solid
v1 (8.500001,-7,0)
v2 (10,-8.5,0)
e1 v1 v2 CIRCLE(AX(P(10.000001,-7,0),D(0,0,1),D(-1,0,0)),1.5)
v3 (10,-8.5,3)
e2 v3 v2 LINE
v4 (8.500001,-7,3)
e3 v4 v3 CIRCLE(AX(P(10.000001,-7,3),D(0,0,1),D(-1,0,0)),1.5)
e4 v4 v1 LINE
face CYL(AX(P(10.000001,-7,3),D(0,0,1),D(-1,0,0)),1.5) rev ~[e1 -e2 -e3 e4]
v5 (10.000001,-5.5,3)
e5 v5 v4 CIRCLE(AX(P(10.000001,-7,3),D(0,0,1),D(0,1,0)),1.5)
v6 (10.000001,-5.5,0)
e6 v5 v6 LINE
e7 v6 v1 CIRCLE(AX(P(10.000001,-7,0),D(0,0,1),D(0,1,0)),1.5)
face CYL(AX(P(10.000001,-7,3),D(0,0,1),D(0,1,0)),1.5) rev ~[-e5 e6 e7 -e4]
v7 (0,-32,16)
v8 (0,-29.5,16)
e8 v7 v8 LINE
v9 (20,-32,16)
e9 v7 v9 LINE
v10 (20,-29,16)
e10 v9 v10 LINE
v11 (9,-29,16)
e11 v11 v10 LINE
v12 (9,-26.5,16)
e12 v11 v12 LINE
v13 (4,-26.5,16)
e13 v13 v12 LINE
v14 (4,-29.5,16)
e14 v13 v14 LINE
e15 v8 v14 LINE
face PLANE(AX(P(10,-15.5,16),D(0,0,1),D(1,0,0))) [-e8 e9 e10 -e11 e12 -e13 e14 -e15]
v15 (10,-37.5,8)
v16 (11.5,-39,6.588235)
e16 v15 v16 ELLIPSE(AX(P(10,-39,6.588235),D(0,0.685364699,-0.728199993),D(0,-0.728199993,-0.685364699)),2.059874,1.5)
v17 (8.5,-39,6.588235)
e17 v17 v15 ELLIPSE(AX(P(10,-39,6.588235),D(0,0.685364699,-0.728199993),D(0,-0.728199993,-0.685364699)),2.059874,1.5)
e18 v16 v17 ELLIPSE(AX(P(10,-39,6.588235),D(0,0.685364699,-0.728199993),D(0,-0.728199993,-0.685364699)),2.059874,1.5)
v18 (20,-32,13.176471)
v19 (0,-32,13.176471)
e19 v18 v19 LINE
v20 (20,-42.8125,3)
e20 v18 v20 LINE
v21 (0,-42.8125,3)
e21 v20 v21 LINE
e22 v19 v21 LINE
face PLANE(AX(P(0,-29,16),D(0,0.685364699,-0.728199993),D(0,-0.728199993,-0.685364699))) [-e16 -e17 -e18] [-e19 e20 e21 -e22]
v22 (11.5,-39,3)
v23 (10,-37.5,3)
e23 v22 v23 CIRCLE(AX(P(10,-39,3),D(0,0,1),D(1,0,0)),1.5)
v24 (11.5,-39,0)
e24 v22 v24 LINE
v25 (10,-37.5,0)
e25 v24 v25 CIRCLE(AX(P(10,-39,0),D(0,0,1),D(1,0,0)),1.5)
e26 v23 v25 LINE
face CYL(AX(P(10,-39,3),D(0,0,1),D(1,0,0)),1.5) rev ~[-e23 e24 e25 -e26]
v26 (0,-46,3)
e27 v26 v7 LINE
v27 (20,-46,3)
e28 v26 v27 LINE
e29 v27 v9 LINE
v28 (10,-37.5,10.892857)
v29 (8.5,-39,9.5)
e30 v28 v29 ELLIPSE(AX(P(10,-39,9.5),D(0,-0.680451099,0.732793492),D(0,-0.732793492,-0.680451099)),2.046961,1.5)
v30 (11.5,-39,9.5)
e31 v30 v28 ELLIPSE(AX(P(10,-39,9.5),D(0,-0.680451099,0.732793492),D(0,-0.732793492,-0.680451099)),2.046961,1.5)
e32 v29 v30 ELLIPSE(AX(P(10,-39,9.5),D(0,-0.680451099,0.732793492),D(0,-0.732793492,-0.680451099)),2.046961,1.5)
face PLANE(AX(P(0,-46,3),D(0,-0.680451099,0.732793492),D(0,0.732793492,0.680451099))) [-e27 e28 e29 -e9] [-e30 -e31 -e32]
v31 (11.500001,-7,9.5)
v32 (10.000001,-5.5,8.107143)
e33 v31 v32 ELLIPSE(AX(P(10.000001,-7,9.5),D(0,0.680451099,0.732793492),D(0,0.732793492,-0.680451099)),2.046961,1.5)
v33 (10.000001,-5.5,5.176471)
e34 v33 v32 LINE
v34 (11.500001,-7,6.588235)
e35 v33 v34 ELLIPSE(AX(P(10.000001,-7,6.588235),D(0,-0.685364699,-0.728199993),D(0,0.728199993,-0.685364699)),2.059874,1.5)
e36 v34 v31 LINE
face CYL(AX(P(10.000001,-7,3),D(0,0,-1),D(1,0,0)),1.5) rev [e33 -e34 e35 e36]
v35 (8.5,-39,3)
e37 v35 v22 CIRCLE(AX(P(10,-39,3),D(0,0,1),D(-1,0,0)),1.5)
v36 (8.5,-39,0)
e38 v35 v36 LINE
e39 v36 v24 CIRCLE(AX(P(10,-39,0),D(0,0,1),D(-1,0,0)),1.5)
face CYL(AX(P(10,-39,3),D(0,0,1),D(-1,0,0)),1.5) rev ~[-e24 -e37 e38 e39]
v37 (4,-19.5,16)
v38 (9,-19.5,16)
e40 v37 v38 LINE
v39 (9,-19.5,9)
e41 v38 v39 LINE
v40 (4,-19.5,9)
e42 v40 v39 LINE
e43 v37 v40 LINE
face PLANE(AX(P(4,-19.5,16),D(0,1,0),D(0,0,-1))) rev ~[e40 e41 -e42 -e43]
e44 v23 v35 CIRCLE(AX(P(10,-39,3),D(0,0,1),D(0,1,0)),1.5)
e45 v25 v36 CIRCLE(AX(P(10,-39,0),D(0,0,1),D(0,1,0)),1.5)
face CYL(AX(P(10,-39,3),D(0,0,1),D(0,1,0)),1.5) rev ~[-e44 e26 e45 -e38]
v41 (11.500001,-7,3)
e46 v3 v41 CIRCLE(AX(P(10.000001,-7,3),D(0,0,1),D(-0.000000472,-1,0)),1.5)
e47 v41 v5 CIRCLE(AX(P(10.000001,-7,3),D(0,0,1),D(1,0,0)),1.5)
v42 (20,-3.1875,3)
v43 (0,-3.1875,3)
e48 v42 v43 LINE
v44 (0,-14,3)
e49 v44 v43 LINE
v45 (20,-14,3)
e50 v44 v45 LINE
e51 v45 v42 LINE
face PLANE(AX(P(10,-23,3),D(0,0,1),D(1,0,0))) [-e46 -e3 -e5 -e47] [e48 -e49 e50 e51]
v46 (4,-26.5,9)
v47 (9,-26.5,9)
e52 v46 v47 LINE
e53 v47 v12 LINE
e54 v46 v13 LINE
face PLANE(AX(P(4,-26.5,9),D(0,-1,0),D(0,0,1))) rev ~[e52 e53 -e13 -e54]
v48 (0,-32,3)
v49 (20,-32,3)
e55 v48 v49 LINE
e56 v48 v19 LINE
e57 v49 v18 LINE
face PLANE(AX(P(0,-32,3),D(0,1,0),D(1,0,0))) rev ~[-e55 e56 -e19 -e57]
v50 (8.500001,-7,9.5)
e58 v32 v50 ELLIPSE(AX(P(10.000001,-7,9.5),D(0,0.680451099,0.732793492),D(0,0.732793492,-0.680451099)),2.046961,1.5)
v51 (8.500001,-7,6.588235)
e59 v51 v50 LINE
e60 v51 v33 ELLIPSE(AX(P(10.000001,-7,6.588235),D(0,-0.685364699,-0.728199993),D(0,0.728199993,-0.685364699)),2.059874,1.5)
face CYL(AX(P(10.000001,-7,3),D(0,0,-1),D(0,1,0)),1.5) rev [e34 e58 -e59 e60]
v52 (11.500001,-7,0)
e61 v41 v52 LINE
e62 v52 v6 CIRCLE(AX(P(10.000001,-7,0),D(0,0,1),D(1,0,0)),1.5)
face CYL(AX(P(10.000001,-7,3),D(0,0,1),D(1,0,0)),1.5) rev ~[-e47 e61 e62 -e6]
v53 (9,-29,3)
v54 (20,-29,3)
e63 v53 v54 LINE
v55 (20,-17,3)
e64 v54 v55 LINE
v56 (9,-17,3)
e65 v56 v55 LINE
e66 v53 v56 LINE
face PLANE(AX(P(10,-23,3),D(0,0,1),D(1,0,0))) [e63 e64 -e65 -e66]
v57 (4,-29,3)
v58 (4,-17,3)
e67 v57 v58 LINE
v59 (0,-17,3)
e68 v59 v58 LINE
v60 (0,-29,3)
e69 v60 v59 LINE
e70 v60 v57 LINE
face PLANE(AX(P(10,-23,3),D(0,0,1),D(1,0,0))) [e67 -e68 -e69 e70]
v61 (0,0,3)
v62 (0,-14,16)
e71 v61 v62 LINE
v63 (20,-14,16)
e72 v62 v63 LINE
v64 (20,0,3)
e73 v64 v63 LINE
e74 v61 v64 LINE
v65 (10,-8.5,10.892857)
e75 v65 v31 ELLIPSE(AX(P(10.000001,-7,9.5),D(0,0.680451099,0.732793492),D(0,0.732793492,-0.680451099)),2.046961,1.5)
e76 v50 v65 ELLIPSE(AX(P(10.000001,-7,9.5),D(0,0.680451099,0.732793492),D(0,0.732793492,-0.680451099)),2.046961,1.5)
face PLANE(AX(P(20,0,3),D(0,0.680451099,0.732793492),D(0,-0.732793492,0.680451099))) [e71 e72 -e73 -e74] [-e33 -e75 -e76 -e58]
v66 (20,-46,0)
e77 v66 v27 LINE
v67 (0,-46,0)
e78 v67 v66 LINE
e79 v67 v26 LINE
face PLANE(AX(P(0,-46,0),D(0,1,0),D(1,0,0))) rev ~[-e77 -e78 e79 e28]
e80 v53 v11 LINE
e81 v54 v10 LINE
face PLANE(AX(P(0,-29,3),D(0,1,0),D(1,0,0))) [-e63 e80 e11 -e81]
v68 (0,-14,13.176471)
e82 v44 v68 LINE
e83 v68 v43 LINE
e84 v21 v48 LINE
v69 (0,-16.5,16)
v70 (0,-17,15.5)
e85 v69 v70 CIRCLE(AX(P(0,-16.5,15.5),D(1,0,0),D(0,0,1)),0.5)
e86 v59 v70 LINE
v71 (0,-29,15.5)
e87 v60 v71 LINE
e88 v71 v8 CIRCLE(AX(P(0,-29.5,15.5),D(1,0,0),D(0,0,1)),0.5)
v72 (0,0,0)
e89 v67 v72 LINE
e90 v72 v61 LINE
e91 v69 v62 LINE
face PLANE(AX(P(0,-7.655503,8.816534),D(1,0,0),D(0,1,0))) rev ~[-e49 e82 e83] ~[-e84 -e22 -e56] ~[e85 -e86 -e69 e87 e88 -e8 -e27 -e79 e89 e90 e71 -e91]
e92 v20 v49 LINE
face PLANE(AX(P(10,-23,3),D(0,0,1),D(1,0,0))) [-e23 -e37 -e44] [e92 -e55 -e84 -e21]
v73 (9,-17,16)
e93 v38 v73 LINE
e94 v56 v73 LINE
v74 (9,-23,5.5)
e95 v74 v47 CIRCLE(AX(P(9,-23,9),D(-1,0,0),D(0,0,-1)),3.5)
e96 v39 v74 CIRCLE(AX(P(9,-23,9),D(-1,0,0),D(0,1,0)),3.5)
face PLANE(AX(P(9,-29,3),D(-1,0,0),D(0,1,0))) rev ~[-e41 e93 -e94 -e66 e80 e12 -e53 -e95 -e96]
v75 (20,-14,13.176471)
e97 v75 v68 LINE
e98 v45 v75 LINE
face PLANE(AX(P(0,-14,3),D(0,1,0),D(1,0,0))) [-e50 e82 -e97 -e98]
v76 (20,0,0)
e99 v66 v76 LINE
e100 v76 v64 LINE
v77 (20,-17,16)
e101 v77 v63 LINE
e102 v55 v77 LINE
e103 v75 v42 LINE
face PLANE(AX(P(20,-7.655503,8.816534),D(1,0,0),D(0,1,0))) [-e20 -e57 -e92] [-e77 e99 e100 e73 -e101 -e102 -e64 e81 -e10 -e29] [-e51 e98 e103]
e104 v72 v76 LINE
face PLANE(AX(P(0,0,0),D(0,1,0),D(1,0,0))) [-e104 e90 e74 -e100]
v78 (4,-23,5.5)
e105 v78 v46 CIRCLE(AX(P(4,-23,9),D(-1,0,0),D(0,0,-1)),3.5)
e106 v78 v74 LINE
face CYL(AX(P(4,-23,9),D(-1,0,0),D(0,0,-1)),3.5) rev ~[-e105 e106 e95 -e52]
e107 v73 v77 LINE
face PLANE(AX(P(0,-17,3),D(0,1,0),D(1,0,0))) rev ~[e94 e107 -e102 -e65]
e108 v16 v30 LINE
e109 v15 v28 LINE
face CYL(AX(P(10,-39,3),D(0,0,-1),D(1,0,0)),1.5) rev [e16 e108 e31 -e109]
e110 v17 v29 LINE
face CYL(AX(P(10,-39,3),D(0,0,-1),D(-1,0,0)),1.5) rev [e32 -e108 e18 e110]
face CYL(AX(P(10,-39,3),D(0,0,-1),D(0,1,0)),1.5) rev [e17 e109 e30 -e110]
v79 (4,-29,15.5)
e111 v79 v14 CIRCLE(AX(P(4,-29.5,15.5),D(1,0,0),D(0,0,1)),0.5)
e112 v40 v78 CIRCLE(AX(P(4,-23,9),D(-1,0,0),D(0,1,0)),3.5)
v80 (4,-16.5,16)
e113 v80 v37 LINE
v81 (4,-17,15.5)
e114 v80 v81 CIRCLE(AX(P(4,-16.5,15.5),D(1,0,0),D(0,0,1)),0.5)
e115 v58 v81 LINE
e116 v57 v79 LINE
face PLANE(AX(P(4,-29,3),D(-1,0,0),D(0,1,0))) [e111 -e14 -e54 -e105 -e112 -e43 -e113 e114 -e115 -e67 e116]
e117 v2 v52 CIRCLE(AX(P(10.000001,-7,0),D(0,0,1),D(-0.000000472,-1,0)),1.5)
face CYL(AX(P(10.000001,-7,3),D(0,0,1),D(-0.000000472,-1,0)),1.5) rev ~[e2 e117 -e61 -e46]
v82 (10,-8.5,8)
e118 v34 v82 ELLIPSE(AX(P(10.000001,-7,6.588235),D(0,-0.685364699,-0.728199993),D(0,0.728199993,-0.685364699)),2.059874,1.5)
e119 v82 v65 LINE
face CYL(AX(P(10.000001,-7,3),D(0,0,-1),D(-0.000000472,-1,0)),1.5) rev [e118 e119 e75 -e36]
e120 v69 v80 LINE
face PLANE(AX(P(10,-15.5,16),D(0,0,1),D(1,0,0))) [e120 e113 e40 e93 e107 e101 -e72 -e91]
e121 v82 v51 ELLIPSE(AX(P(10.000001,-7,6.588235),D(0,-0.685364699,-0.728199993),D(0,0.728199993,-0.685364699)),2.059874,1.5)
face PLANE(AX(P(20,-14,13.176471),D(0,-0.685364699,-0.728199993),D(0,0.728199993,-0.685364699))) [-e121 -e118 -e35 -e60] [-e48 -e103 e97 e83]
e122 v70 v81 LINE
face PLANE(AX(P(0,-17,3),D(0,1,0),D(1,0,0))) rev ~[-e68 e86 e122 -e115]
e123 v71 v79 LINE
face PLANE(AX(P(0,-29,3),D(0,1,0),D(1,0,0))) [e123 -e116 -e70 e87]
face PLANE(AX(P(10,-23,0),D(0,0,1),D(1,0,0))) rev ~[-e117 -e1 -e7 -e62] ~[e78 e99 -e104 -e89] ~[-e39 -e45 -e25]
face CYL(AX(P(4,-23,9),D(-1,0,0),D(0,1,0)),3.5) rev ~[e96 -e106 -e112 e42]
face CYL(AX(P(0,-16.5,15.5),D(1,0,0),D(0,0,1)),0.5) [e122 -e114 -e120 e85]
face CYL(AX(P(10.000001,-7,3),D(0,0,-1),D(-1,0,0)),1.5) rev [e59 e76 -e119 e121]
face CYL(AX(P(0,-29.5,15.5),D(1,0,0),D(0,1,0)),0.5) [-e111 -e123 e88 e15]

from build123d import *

# Parameters (mm, degrees)
F0_W      = 20
F0_H      = 46
F1_DEPTH  = 3
F2_W      = 20
F2_H      = 3
F3_DEPTH  = 13
F6_DEPTH  = 25
F7_DEPTH  = 25
F9_DEPTH  = 20
F11_DEPTH = 20
F12_DEPTH = 25
F13_DEPTH = 25
F14_W     = 5
F14_H     = 12
F15_DEPTH = 13
F17_DEPTH = 25
F18_R     = 0.5


# Not quite as in the source:
# - ends of sketch curves that miss each other by under 0.0002 mm in the source are joined


with BuildPart() as f1:
    # F0 (on Top) → F1 (new body)
    with BuildSketch(Plane.XY):
        with Locations((10, -23)):
            Rectangle(F0_W, F0_H)
    extrude(amount=F1_DEPTH)

    # F2 (on face) → F3 (join)
    with BuildSketch(Plane.XY.offset(3)):
        with Locations((10, -15.5)):
            Rectangle(F2_W, F2_H)
        with Locations((10, -30.5)):
            Rectangle(F2_W, F2_H)
    extrude(amount=F3_DEPTH)

    # F5 (on face) → F6 (cut)
    with BuildSketch(Plane.XY.offset(3)):
        with BuildLine():
            Line((10, -39), (8.5, -39))
            ThreePointArc((8.5, -39), (10, -40.5), (11.5, -39))
            ThreePointArc((11.5, -39), (11.0606601718, -37.9393398282), (10, -37.5))
            Line((10, -37.5), (10, -39))
        make_face()
        with BuildLine():
            ThreePointArc((10, -37.5), (8.9393398282, -37.9393398282), (8.5, -39))
            Line((8.5, -39), (10, -39))
            Line((10, -39), (10, -37.5))
        make_face()
    extrude(amount=-F6_DEPTH, mode=Mode.SUBTRACT)

    # F5 (on face) → F7 (cut)
    with BuildSketch(Plane.XY.offset(3)):
        with BuildLine():
            ThreePointArc((11.5000007078, -7), (11.0606608796, -5.9393398282), (10.0000007078, -5.5))
            Line((10.0000007078, -5.5), (10.0000007078, -7))
            Line((10.0000007078, -7), (10, -8.5))
            ThreePointArc((10, -8.5), (11.0606606293, -8.060660422), (11.5000007078, -7))
        make_face()
        with BuildLine():
            Line((10.0000007078, -7), (8.5000007078, -7))
            ThreePointArc((8.5000007078, -7), (8.9393402858, -8.0606599215), (10, -8.5))
            Line((10, -8.5), (10.0000007078, -7))
        make_face()
        with BuildLine():
            Line((10.0000007078, -7), (10.0000007078, -5.5))
            ThreePointArc((10.0000007078, -5.5), (8.939340536, -5.9393398282), (8.5000007078, -7))
            Line((8.5000007078, -7), (10.0000007078, -7))
        make_face()
    extrude(amount=-F7_DEPTH, mode=Mode.SUBTRACT)

    # F8 (on face) → F9 (join)
    with BuildSketch(Plane(origin=(0, 0, 0), x_dir=(0, -1, 0), z_dir=(-1, 0, 0))):
        Polygon((46, 3), (32, 16), (29, 16), (46, 0), align=None)
    extrude(amount=-F9_DEPTH)

    # F10 (on face) → F11 (join)
    with BuildSketch(Plane.YZ.offset(20)):
        Polygon((0, 3), (-14, 16), (-14, 13.1764705882), (-3.1875, 3), align=None)
    extrude(amount=-F11_DEPTH)

    # F5 (on face) → F12 (cut)
    with BuildSketch(Plane.XY.offset(3)):
        with BuildLine():
            Line((10, -39), (8.5, -39))
            ThreePointArc((8.5, -39), (10, -40.5), (11.5, -39))
            ThreePointArc((11.5, -39), (11.0606601718, -37.9393398282), (10, -37.5))
            Line((10, -37.5), (10, -39))
        make_face()
        with BuildLine():
            ThreePointArc((10, -37.5), (8.9393398282, -37.9393398282), (8.5, -39))
            Line((8.5, -39), (10, -39))
            Line((10, -39), (10, -37.5))
        make_face()
    extrude(amount=F12_DEPTH, mode=Mode.SUBTRACT)

    # F5 (on face) → F13 (cut)
    with BuildSketch(Plane.XY.offset(3)):
        with BuildLine():
            ThreePointArc((11.5000007078, -7), (11.0606608796, -5.9393398282), (10.0000007078, -5.5))
            Line((10.0000007078, -5.5), (10.0000007078, -7))
            Line((10.0000007078, -7), (10, -8.5))
            ThreePointArc((10, -8.5), (11.0606606293, -8.060660422), (11.5000007078, -7))
        make_face()
        with BuildLine():
            Line((10.0000007078, -7), (8.5000007078, -7))
            ThreePointArc((8.5000007078, -7), (8.9393402858, -8.0606599215), (10, -8.5))
            Line((10, -8.5), (10.0000007078, -7))
        make_face()
        with BuildLine():
            Line((10.0000007078, -7), (10.0000007078, -5.5))
            ThreePointArc((10.0000007078, -5.5), (8.939340536, -5.9393398282), (8.5000007078, -7))
            Line((8.5000007078, -7), (10.0000007078, -7))
        make_face()
    extrude(amount=F13_DEPTH, mode=Mode.SUBTRACT)

    # F14 (on face) → F15 (join)
    with BuildSketch(Plane.XY.offset(3)):
        with Locations((6.5, -23)):
            Rectangle(F14_W, F14_H)
    extrude(amount=F15_DEPTH)

    # F16 (on face) → F17 (cut)
    with BuildSketch(Plane(origin=(4, 0, 0), x_dir=(0, -1, 0), z_dir=(-1, 0, 0))):
        with BuildLine():
            Line((19.5, 16), (19.5, 9))
            ThreePointArc((19.5, 9), (23, 12.5), (26.5, 9))
            Line((26.5, 9), (26.5, 16))
            Line((26.5, 16), (19.5, 16))
        make_face()
        with BuildLine():
            ThreePointArc((26.5, 9), (23, 12.5), (19.5, 9))
            Line((19.5, 9), (23, 9))
            Line((23, 9), (26.5, 9))
        make_face()
        with BuildLine():
            ThreePointArc((19.5, 9), (20.5251262658, 6.5251262658), (23, 5.5))
            Line((23, 5.5), (23, 9))
            Line((23, 9), (19.5, 9))
        make_face()
        with BuildLine():
            Line((23, 9), (23, 5.5))
            ThreePointArc((23, 5.5), (25.4748737342, 6.5251262658), (26.5, 9))
            Line((26.5, 9), (23, 9))
        make_face()
    extrude(amount=-F17_DEPTH, mode=Mode.SUBTRACT)

    # F18
    f18_edges = [f1.edges().sort_by_distance(p)[0] for p in [
        (2, -17, 16),
        (2, -29, 16),
    ]]
    fillet(f18_edges, radius=F18_R)


solid = f1.part
